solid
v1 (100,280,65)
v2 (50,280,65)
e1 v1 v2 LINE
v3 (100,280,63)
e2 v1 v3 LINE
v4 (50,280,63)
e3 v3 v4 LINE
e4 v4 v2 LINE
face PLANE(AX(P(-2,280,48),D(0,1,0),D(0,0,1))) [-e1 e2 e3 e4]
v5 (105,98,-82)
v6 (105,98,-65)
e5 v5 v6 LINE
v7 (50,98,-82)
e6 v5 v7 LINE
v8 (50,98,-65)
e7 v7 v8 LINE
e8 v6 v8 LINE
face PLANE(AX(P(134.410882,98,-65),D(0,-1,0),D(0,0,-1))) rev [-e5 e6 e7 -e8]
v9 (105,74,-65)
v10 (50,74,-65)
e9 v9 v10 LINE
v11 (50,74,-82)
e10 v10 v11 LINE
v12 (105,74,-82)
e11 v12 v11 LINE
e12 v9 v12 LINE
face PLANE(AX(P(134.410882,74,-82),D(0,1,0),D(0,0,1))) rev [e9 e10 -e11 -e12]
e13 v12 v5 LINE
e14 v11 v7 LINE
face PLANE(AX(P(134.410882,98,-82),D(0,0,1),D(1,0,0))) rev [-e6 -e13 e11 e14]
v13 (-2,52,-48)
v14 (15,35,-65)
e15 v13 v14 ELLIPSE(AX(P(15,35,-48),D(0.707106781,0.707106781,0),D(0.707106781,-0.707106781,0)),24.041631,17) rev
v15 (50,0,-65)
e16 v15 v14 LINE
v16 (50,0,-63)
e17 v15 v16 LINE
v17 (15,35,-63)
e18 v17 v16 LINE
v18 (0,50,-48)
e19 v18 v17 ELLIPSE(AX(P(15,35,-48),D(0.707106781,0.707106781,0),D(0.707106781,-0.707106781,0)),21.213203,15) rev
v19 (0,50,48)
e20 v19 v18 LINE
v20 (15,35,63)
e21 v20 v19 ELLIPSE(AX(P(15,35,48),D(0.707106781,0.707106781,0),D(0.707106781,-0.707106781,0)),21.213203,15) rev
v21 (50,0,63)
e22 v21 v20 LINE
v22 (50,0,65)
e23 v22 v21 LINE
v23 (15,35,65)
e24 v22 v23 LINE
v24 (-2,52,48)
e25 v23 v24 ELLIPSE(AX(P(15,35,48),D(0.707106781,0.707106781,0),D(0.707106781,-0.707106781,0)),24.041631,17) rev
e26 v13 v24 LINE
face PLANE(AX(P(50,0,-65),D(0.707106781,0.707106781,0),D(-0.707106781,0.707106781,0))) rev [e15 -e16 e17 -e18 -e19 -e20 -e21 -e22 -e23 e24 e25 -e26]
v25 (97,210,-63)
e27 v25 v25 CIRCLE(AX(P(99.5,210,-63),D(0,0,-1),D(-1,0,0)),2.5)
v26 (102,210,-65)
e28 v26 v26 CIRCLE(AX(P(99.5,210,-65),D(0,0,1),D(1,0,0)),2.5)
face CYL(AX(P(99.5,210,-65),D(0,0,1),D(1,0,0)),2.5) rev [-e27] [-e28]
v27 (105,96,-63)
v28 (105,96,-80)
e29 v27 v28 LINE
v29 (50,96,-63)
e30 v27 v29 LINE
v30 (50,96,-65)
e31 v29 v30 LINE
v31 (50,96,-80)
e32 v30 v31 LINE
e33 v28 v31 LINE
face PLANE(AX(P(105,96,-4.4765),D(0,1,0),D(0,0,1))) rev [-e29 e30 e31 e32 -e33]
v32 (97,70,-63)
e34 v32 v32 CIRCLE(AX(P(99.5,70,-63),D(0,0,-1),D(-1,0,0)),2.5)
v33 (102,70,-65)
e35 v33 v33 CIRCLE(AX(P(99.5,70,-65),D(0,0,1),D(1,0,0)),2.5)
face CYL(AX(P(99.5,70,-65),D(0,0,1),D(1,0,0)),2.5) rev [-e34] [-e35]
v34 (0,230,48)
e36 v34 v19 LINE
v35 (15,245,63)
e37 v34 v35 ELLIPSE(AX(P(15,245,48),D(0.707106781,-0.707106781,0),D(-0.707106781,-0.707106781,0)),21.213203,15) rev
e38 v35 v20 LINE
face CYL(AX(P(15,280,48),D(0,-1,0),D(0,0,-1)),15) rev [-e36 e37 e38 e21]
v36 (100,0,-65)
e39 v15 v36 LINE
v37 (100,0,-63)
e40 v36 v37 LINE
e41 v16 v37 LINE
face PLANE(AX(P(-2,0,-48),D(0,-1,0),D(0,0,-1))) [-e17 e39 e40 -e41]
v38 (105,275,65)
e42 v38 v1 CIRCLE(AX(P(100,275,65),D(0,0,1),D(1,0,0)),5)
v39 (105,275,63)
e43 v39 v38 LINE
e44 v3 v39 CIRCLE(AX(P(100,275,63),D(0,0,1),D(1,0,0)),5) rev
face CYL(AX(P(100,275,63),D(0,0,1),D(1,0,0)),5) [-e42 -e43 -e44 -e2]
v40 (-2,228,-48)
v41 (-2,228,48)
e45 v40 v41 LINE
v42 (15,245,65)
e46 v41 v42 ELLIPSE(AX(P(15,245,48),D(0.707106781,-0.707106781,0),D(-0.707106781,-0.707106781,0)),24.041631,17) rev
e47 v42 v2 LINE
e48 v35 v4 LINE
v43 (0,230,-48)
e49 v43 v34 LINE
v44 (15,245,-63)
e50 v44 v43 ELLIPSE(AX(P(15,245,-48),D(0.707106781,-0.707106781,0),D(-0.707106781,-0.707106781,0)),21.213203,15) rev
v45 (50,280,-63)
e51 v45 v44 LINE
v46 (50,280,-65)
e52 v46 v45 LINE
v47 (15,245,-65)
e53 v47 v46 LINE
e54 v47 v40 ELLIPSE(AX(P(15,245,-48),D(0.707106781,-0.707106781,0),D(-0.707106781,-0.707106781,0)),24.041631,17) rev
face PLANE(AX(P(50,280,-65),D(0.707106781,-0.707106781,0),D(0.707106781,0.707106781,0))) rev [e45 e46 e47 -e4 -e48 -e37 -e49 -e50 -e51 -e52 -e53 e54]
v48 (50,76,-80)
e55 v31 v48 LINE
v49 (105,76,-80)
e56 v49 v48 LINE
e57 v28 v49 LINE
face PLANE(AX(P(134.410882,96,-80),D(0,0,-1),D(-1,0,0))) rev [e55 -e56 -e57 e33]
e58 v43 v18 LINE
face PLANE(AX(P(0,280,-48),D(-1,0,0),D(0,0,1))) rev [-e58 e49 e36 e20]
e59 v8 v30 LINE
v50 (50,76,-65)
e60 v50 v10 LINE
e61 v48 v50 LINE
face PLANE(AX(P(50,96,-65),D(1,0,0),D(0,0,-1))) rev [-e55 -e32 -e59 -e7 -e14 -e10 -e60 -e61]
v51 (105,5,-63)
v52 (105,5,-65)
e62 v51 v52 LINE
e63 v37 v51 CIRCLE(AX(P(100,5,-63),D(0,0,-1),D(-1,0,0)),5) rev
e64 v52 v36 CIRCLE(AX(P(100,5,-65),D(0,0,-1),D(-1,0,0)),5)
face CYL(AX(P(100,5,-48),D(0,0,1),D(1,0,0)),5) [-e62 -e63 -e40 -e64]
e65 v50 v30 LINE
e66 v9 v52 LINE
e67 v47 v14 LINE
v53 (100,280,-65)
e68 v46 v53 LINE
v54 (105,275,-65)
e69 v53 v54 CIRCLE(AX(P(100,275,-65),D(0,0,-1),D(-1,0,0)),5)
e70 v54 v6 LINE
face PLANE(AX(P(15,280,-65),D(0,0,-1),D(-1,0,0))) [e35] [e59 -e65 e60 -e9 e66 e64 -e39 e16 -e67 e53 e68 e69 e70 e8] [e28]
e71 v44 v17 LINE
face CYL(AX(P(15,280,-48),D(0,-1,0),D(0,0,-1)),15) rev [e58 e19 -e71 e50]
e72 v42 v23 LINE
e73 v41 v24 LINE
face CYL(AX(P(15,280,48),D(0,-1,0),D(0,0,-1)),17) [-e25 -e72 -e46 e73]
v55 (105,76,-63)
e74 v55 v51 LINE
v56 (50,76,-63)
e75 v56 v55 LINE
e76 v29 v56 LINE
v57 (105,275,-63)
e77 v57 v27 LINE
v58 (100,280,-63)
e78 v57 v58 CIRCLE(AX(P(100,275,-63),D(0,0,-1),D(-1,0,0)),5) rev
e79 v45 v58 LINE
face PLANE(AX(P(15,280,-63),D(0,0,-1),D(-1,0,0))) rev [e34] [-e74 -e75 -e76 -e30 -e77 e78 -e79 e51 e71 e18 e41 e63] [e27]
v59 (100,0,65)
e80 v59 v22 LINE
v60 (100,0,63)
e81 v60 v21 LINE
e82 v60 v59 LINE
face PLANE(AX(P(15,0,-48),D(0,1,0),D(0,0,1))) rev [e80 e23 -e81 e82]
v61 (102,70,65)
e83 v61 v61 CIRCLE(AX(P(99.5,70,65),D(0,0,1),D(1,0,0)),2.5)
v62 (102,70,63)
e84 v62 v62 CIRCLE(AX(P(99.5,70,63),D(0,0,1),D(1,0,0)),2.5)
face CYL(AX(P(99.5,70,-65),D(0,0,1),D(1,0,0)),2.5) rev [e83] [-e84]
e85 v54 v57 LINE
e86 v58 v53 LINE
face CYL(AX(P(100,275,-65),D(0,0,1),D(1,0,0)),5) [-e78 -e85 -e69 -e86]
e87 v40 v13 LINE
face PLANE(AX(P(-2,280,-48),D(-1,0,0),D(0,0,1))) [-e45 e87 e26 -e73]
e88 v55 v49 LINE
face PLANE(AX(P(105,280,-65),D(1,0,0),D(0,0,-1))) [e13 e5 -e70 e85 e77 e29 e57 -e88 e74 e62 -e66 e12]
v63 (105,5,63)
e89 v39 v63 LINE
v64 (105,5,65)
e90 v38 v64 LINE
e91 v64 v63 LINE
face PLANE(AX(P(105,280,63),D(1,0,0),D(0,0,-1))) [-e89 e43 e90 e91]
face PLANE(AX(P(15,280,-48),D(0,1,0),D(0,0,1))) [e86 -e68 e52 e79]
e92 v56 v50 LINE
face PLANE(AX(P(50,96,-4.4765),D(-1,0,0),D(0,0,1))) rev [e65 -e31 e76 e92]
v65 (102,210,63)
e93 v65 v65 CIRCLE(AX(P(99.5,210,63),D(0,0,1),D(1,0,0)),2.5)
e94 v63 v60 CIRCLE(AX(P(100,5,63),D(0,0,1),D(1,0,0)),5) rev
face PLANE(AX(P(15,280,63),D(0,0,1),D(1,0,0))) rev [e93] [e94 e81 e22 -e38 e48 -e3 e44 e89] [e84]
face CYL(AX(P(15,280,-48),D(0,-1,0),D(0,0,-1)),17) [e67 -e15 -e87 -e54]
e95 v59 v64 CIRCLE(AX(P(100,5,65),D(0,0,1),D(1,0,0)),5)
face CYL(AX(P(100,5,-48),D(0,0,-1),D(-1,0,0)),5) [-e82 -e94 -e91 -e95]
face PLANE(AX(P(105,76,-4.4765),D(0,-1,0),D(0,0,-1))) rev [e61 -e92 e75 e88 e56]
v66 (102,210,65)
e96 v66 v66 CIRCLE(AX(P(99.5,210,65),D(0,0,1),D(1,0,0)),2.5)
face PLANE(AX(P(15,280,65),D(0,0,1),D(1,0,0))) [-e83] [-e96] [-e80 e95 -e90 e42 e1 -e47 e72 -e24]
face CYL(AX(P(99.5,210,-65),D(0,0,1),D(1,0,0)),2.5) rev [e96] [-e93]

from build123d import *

# Parameters (mm, degrees)
SM_BASE_FLANGE_1_DEPTH = 280
SKETCH_3_R             = 2.5
CUT_EXTRUDE_2_DEPTH    = 327.075144714
CUT_EXTRUDE_3_DEPTH    = 327.075144714
FILLET_1_R             = 5
SKETCH_5_W             = 55
SKETCH_5_H             = 20
CUT_EXTRUDE_4_DEPTH    = 2
EXTRUDE_1_DEPTH        = 55


# Sheet-metal steps are written as plain solids
with BuildPart() as part:
    # Sketch 1 → 基体-法兰1 (new body)
    with BuildSketch(Plane(origin=(0, 0, 0), x_dir=(1, 0, 0), z_dir=(0, 1, 0))):
        with BuildLine():
            Line((105, 63), (15, 63))
            ThreePointArc((15, 63), (4.393398282, 58.606601718), (0, 48))
            Line((0, 48), (0, -48))
            ThreePointArc((0, -48), (4.393398282, -58.606601718), (15, -63))
            Line((15, -63), (105, -63))
            Line((105, -63), (105, -65))
            Line((105, -65), (15, -65))
            ThreePointArc((15, -65), (2.97918472, -60.02081528), (-2, -48))
            Line((-2, -48), (-2, 48))
            ThreePointArc((-2, 48), (2.97918472, 60.02081528), (15, 65))
            Line((15, 65), (105, 65))
            Line((105, 65), (105, 63))
        make_face()
    extrude(amount=SM_BASE_FLANGE_1_DEPTH)

    # 草图3 → 切除-拉伸2 (cut, through all)
    with BuildSketch(Plane.XY.offset(65)):
        with Locations((99.5, 210)):
            Circle(SKETCH_3_R)
        with Locations((99.5, 70)):
            Circle(SKETCH_3_R)
    extrude(amount=-CUT_EXTRUDE_2_DEPTH, mode=Mode.SUBTRACT)

    # 草图4 → 切除-拉伸3 (cut, through all)
    with BuildSketch(Plane.XY.offset(65)):
        Polygon((50, 280), (-2, 228), (-2, 280), align=None)
        Polygon((-2, 52), (-2, 0), (50, 0), align=None)
    extrude(amount=-CUT_EXTRUDE_3_DEPTH, mode=Mode.SUBTRACT)

    # 圆角1
    fillet_1_edges = [part.edges().sort_by_distance(p)[0] for p in [
        (105, 0, 64),
        (105, 0, -64),
        (105, 280, 64),
        (105, 280, -64),
    ]]
    fillet(fillet_1_edges, radius=FILLET_1_R)

    # 草图5 → 切除-拉伸4 (cut)
    with BuildSketch(Plane(origin=(0, 0, -65), x_dir=(-1, 0, 0), z_dir=(0, 0, -1))):
        with Locations((-77.5, 86)):
            Rectangle(SKETCH_5_W, SKETCH_5_H)
    extrude(amount=-CUT_EXTRUDE_4_DEPTH, mode=Mode.SUBTRACT)

    # 草图6 → 凸台-拉伸1 (add)
    with BuildSketch(Plane(origin=(50, 0, 0), x_dir=(0, 0, -1), z_dir=(1, 0, 0))):
        Polygon((65, 96), (80, 96), (80, 76), (65, 76), (65, 74), (82, 74), (82, 98), (65, 98), align=None)
    extrude(amount=EXTRUDE_1_DEPTH)


solid = part.part
